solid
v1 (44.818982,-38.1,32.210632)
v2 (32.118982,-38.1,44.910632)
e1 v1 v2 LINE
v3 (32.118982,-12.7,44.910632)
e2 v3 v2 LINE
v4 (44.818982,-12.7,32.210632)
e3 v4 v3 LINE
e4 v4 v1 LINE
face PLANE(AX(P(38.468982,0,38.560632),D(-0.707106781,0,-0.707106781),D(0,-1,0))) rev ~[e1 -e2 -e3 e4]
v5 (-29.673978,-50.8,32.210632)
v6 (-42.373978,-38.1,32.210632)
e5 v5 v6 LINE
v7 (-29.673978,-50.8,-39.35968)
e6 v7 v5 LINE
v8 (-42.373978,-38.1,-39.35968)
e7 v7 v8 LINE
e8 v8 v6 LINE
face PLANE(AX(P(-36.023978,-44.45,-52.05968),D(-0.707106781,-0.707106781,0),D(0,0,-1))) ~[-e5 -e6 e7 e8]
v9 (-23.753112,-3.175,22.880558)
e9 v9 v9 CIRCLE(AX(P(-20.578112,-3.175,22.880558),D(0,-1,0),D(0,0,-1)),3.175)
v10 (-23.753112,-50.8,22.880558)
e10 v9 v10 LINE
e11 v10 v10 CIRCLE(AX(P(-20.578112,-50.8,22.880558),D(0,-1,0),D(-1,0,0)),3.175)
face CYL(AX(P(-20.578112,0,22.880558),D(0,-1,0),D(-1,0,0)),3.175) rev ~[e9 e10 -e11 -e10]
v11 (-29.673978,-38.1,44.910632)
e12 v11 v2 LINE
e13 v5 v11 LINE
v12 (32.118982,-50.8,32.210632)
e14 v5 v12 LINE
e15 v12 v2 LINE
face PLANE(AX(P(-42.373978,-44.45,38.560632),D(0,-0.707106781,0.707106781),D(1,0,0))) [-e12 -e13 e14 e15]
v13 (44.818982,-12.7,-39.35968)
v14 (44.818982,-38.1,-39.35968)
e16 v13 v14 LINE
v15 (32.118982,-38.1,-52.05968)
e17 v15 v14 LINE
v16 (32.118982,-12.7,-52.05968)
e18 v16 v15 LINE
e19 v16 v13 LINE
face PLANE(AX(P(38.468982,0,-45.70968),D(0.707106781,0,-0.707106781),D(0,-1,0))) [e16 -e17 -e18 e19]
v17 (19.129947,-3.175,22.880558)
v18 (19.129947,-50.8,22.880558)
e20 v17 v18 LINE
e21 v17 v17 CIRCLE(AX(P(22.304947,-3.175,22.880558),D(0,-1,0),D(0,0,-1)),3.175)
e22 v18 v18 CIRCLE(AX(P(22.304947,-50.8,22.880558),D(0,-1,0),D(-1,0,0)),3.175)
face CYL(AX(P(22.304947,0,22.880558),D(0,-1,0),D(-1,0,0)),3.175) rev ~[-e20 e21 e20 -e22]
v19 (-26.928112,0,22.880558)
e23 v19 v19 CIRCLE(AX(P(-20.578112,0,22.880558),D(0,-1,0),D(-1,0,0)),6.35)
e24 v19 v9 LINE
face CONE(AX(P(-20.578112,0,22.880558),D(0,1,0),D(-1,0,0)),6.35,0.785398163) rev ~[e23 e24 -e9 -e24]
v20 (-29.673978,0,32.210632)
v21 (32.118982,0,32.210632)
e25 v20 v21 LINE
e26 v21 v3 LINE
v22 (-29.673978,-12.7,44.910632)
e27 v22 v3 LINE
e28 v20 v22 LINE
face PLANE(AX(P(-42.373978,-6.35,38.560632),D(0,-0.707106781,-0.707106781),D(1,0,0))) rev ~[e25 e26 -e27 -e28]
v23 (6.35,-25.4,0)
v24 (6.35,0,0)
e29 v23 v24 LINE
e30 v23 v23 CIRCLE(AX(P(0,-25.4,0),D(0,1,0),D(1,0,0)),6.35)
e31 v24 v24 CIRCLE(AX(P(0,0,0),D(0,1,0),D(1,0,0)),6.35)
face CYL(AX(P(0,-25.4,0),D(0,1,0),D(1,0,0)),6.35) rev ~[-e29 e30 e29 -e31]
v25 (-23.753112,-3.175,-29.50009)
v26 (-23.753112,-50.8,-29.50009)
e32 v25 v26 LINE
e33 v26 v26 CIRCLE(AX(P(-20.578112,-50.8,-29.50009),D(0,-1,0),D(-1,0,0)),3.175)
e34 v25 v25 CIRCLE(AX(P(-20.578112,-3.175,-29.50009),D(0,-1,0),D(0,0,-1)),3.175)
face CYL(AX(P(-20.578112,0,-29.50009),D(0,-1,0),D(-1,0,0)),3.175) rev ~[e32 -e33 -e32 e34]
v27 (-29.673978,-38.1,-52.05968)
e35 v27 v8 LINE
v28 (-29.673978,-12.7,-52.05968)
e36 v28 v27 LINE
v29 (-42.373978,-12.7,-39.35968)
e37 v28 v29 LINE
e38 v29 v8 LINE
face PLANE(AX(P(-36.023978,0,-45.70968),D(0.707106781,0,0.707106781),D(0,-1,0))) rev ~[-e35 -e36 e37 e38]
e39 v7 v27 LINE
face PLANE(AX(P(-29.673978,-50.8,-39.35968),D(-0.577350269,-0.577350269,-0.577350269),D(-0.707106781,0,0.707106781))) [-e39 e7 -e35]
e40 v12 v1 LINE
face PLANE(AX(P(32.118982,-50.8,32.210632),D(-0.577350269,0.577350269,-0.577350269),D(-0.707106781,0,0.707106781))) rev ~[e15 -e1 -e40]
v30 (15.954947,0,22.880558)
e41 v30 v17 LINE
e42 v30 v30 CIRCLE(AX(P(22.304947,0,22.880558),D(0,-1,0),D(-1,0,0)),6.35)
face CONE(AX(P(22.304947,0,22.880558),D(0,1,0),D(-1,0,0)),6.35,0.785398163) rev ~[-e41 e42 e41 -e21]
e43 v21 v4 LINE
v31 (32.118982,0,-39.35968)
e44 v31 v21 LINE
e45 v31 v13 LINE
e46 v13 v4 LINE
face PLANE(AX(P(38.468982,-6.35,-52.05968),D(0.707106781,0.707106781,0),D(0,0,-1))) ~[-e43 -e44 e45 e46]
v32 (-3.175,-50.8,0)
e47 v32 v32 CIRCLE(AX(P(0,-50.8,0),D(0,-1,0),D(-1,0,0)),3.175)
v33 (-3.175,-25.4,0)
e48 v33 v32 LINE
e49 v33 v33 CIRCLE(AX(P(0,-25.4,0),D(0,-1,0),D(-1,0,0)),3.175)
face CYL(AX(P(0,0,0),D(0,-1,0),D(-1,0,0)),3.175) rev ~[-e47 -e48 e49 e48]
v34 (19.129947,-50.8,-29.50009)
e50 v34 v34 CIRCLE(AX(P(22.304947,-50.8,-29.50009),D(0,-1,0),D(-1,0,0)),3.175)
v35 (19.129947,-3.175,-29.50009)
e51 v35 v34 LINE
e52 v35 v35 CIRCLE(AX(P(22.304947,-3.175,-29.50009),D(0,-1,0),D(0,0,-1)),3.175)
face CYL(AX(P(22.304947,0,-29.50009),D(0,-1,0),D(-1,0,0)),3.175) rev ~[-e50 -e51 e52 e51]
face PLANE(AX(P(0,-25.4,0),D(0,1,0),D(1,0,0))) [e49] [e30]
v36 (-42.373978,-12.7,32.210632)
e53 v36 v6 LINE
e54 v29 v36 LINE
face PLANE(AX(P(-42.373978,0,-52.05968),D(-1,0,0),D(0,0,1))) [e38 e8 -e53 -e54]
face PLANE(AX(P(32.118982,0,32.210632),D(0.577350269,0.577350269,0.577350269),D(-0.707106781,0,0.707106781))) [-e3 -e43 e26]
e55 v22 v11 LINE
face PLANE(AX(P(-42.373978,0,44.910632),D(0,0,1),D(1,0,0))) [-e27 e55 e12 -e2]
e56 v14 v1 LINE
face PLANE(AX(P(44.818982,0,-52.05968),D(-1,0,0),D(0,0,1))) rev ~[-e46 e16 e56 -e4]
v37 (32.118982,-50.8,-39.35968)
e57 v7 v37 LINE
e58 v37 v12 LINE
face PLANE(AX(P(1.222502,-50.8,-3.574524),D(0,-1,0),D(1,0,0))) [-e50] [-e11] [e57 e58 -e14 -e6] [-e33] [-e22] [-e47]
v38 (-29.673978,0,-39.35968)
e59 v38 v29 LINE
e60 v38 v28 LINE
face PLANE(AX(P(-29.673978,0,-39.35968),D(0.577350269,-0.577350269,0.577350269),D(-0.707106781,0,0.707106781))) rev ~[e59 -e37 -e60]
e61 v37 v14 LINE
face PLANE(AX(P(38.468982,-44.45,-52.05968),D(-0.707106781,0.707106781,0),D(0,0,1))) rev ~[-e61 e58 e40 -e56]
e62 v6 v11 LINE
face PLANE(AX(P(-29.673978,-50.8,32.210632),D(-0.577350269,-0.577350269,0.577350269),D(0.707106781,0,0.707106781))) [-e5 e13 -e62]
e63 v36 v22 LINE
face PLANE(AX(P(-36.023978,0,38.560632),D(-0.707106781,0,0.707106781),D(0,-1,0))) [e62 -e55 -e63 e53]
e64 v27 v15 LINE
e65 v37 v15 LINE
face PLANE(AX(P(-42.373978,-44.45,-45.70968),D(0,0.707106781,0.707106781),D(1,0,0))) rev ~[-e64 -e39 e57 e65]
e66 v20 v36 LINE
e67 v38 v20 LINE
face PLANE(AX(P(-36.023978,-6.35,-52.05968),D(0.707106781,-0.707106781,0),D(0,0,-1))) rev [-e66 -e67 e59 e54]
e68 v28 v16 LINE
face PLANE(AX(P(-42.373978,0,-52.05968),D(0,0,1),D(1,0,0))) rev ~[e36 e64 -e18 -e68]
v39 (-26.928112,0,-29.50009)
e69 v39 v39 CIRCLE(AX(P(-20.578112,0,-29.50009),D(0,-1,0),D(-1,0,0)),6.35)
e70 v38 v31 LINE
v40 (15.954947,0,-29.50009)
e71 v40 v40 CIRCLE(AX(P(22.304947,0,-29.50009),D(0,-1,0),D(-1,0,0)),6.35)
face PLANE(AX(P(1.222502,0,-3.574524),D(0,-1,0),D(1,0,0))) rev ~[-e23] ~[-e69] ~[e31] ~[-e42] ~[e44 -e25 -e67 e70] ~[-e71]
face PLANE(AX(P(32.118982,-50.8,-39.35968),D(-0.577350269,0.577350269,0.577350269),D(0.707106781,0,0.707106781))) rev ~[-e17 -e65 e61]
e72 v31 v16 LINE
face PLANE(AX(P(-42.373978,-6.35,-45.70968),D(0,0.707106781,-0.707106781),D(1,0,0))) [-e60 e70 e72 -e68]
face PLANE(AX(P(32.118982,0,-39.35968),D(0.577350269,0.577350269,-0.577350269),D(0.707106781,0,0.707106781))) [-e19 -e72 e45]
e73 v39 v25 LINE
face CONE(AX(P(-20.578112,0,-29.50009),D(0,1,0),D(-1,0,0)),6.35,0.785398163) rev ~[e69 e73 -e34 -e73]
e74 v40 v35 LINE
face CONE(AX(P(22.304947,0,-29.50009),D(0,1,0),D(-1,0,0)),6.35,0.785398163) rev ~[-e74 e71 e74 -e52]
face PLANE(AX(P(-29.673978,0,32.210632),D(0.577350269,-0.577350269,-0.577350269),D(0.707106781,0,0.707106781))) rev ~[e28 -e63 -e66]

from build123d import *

# Parameters (mm, degrees)
F0_W           = 87.1929600835
F0_H           = 96.9703122973
F1_DEPTH       = 50.8
F3_D           = 6.35
F3_CBORE_D     = 12.7
F3_CBORE_DEPTH = 25.4
F5_D           = 6.35
F5_CSINK_D     = 12.7
F5_CSINK_ANGLE = 90
F6_SIZE        = 12.7


# Not quite as in the source:
# - a feature names something its author has since deleted; it is built from what else it names


with BuildPart() as f1:
    # F0 (on Front) → F1 (new body)
    with BuildSketch(Plane.XZ):
        with Locations((1.2225024402, -3.5745240748)):
            Rectangle(F0_W, F0_H)
    extrude(amount=F1_DEPTH)

    # F3 (through all)
    with Locations(Plane(origin=(0, 0, 0), x_dir=(1, 0, 0), z_dir=(0, 1, 0))):
        with Locations((0, 0)):
            CounterBoreHole(F3_D / 2, F3_CBORE_D / 2, F3_CBORE_DEPTH)

    # F5 (through all)
    with Locations(Plane(origin=(0, 0, 0), x_dir=(1, 0, 0), z_dir=(0, 1, 0))):
        with Locations((22.3049465567, -22.8805579245), (-20.5781124532, -22.8805579245), (-20.5781124532, 29.5000895858), (22.3049465567, 29.5000895858)):
            CounterSinkHole(F5_D / 2, F5_CSINK_D / 2, counter_sink_angle=F5_CSINK_ANGLE)

    # F6
    f6_edges = [f1.edges().sort_by_distance(p)[0] for p in [
        (-42.373978, -25.4, -52.05968),
        (44.818982, -25.4, -52.05968),
        (1.222502, 0, -52.05968),
        (1.222502, -50.8, -52.05968),
        (-42.373978, -25.4, 44.910632),
        (-42.373978, 0, -3.574524),
        (-42.373978, -50.8, -3.574524),
        (44.818982, -25.4, 44.910632),
        (44.818982, 0, -3.574524),
        (44.818982, -50.8, -3.574524),
        (1.222502, 0, 44.910632),
        (1.222502, -50.8, 44.910632),
    ]]
    chamfer(f6_edges, length=F6_SIZE)


solid = f1.part
